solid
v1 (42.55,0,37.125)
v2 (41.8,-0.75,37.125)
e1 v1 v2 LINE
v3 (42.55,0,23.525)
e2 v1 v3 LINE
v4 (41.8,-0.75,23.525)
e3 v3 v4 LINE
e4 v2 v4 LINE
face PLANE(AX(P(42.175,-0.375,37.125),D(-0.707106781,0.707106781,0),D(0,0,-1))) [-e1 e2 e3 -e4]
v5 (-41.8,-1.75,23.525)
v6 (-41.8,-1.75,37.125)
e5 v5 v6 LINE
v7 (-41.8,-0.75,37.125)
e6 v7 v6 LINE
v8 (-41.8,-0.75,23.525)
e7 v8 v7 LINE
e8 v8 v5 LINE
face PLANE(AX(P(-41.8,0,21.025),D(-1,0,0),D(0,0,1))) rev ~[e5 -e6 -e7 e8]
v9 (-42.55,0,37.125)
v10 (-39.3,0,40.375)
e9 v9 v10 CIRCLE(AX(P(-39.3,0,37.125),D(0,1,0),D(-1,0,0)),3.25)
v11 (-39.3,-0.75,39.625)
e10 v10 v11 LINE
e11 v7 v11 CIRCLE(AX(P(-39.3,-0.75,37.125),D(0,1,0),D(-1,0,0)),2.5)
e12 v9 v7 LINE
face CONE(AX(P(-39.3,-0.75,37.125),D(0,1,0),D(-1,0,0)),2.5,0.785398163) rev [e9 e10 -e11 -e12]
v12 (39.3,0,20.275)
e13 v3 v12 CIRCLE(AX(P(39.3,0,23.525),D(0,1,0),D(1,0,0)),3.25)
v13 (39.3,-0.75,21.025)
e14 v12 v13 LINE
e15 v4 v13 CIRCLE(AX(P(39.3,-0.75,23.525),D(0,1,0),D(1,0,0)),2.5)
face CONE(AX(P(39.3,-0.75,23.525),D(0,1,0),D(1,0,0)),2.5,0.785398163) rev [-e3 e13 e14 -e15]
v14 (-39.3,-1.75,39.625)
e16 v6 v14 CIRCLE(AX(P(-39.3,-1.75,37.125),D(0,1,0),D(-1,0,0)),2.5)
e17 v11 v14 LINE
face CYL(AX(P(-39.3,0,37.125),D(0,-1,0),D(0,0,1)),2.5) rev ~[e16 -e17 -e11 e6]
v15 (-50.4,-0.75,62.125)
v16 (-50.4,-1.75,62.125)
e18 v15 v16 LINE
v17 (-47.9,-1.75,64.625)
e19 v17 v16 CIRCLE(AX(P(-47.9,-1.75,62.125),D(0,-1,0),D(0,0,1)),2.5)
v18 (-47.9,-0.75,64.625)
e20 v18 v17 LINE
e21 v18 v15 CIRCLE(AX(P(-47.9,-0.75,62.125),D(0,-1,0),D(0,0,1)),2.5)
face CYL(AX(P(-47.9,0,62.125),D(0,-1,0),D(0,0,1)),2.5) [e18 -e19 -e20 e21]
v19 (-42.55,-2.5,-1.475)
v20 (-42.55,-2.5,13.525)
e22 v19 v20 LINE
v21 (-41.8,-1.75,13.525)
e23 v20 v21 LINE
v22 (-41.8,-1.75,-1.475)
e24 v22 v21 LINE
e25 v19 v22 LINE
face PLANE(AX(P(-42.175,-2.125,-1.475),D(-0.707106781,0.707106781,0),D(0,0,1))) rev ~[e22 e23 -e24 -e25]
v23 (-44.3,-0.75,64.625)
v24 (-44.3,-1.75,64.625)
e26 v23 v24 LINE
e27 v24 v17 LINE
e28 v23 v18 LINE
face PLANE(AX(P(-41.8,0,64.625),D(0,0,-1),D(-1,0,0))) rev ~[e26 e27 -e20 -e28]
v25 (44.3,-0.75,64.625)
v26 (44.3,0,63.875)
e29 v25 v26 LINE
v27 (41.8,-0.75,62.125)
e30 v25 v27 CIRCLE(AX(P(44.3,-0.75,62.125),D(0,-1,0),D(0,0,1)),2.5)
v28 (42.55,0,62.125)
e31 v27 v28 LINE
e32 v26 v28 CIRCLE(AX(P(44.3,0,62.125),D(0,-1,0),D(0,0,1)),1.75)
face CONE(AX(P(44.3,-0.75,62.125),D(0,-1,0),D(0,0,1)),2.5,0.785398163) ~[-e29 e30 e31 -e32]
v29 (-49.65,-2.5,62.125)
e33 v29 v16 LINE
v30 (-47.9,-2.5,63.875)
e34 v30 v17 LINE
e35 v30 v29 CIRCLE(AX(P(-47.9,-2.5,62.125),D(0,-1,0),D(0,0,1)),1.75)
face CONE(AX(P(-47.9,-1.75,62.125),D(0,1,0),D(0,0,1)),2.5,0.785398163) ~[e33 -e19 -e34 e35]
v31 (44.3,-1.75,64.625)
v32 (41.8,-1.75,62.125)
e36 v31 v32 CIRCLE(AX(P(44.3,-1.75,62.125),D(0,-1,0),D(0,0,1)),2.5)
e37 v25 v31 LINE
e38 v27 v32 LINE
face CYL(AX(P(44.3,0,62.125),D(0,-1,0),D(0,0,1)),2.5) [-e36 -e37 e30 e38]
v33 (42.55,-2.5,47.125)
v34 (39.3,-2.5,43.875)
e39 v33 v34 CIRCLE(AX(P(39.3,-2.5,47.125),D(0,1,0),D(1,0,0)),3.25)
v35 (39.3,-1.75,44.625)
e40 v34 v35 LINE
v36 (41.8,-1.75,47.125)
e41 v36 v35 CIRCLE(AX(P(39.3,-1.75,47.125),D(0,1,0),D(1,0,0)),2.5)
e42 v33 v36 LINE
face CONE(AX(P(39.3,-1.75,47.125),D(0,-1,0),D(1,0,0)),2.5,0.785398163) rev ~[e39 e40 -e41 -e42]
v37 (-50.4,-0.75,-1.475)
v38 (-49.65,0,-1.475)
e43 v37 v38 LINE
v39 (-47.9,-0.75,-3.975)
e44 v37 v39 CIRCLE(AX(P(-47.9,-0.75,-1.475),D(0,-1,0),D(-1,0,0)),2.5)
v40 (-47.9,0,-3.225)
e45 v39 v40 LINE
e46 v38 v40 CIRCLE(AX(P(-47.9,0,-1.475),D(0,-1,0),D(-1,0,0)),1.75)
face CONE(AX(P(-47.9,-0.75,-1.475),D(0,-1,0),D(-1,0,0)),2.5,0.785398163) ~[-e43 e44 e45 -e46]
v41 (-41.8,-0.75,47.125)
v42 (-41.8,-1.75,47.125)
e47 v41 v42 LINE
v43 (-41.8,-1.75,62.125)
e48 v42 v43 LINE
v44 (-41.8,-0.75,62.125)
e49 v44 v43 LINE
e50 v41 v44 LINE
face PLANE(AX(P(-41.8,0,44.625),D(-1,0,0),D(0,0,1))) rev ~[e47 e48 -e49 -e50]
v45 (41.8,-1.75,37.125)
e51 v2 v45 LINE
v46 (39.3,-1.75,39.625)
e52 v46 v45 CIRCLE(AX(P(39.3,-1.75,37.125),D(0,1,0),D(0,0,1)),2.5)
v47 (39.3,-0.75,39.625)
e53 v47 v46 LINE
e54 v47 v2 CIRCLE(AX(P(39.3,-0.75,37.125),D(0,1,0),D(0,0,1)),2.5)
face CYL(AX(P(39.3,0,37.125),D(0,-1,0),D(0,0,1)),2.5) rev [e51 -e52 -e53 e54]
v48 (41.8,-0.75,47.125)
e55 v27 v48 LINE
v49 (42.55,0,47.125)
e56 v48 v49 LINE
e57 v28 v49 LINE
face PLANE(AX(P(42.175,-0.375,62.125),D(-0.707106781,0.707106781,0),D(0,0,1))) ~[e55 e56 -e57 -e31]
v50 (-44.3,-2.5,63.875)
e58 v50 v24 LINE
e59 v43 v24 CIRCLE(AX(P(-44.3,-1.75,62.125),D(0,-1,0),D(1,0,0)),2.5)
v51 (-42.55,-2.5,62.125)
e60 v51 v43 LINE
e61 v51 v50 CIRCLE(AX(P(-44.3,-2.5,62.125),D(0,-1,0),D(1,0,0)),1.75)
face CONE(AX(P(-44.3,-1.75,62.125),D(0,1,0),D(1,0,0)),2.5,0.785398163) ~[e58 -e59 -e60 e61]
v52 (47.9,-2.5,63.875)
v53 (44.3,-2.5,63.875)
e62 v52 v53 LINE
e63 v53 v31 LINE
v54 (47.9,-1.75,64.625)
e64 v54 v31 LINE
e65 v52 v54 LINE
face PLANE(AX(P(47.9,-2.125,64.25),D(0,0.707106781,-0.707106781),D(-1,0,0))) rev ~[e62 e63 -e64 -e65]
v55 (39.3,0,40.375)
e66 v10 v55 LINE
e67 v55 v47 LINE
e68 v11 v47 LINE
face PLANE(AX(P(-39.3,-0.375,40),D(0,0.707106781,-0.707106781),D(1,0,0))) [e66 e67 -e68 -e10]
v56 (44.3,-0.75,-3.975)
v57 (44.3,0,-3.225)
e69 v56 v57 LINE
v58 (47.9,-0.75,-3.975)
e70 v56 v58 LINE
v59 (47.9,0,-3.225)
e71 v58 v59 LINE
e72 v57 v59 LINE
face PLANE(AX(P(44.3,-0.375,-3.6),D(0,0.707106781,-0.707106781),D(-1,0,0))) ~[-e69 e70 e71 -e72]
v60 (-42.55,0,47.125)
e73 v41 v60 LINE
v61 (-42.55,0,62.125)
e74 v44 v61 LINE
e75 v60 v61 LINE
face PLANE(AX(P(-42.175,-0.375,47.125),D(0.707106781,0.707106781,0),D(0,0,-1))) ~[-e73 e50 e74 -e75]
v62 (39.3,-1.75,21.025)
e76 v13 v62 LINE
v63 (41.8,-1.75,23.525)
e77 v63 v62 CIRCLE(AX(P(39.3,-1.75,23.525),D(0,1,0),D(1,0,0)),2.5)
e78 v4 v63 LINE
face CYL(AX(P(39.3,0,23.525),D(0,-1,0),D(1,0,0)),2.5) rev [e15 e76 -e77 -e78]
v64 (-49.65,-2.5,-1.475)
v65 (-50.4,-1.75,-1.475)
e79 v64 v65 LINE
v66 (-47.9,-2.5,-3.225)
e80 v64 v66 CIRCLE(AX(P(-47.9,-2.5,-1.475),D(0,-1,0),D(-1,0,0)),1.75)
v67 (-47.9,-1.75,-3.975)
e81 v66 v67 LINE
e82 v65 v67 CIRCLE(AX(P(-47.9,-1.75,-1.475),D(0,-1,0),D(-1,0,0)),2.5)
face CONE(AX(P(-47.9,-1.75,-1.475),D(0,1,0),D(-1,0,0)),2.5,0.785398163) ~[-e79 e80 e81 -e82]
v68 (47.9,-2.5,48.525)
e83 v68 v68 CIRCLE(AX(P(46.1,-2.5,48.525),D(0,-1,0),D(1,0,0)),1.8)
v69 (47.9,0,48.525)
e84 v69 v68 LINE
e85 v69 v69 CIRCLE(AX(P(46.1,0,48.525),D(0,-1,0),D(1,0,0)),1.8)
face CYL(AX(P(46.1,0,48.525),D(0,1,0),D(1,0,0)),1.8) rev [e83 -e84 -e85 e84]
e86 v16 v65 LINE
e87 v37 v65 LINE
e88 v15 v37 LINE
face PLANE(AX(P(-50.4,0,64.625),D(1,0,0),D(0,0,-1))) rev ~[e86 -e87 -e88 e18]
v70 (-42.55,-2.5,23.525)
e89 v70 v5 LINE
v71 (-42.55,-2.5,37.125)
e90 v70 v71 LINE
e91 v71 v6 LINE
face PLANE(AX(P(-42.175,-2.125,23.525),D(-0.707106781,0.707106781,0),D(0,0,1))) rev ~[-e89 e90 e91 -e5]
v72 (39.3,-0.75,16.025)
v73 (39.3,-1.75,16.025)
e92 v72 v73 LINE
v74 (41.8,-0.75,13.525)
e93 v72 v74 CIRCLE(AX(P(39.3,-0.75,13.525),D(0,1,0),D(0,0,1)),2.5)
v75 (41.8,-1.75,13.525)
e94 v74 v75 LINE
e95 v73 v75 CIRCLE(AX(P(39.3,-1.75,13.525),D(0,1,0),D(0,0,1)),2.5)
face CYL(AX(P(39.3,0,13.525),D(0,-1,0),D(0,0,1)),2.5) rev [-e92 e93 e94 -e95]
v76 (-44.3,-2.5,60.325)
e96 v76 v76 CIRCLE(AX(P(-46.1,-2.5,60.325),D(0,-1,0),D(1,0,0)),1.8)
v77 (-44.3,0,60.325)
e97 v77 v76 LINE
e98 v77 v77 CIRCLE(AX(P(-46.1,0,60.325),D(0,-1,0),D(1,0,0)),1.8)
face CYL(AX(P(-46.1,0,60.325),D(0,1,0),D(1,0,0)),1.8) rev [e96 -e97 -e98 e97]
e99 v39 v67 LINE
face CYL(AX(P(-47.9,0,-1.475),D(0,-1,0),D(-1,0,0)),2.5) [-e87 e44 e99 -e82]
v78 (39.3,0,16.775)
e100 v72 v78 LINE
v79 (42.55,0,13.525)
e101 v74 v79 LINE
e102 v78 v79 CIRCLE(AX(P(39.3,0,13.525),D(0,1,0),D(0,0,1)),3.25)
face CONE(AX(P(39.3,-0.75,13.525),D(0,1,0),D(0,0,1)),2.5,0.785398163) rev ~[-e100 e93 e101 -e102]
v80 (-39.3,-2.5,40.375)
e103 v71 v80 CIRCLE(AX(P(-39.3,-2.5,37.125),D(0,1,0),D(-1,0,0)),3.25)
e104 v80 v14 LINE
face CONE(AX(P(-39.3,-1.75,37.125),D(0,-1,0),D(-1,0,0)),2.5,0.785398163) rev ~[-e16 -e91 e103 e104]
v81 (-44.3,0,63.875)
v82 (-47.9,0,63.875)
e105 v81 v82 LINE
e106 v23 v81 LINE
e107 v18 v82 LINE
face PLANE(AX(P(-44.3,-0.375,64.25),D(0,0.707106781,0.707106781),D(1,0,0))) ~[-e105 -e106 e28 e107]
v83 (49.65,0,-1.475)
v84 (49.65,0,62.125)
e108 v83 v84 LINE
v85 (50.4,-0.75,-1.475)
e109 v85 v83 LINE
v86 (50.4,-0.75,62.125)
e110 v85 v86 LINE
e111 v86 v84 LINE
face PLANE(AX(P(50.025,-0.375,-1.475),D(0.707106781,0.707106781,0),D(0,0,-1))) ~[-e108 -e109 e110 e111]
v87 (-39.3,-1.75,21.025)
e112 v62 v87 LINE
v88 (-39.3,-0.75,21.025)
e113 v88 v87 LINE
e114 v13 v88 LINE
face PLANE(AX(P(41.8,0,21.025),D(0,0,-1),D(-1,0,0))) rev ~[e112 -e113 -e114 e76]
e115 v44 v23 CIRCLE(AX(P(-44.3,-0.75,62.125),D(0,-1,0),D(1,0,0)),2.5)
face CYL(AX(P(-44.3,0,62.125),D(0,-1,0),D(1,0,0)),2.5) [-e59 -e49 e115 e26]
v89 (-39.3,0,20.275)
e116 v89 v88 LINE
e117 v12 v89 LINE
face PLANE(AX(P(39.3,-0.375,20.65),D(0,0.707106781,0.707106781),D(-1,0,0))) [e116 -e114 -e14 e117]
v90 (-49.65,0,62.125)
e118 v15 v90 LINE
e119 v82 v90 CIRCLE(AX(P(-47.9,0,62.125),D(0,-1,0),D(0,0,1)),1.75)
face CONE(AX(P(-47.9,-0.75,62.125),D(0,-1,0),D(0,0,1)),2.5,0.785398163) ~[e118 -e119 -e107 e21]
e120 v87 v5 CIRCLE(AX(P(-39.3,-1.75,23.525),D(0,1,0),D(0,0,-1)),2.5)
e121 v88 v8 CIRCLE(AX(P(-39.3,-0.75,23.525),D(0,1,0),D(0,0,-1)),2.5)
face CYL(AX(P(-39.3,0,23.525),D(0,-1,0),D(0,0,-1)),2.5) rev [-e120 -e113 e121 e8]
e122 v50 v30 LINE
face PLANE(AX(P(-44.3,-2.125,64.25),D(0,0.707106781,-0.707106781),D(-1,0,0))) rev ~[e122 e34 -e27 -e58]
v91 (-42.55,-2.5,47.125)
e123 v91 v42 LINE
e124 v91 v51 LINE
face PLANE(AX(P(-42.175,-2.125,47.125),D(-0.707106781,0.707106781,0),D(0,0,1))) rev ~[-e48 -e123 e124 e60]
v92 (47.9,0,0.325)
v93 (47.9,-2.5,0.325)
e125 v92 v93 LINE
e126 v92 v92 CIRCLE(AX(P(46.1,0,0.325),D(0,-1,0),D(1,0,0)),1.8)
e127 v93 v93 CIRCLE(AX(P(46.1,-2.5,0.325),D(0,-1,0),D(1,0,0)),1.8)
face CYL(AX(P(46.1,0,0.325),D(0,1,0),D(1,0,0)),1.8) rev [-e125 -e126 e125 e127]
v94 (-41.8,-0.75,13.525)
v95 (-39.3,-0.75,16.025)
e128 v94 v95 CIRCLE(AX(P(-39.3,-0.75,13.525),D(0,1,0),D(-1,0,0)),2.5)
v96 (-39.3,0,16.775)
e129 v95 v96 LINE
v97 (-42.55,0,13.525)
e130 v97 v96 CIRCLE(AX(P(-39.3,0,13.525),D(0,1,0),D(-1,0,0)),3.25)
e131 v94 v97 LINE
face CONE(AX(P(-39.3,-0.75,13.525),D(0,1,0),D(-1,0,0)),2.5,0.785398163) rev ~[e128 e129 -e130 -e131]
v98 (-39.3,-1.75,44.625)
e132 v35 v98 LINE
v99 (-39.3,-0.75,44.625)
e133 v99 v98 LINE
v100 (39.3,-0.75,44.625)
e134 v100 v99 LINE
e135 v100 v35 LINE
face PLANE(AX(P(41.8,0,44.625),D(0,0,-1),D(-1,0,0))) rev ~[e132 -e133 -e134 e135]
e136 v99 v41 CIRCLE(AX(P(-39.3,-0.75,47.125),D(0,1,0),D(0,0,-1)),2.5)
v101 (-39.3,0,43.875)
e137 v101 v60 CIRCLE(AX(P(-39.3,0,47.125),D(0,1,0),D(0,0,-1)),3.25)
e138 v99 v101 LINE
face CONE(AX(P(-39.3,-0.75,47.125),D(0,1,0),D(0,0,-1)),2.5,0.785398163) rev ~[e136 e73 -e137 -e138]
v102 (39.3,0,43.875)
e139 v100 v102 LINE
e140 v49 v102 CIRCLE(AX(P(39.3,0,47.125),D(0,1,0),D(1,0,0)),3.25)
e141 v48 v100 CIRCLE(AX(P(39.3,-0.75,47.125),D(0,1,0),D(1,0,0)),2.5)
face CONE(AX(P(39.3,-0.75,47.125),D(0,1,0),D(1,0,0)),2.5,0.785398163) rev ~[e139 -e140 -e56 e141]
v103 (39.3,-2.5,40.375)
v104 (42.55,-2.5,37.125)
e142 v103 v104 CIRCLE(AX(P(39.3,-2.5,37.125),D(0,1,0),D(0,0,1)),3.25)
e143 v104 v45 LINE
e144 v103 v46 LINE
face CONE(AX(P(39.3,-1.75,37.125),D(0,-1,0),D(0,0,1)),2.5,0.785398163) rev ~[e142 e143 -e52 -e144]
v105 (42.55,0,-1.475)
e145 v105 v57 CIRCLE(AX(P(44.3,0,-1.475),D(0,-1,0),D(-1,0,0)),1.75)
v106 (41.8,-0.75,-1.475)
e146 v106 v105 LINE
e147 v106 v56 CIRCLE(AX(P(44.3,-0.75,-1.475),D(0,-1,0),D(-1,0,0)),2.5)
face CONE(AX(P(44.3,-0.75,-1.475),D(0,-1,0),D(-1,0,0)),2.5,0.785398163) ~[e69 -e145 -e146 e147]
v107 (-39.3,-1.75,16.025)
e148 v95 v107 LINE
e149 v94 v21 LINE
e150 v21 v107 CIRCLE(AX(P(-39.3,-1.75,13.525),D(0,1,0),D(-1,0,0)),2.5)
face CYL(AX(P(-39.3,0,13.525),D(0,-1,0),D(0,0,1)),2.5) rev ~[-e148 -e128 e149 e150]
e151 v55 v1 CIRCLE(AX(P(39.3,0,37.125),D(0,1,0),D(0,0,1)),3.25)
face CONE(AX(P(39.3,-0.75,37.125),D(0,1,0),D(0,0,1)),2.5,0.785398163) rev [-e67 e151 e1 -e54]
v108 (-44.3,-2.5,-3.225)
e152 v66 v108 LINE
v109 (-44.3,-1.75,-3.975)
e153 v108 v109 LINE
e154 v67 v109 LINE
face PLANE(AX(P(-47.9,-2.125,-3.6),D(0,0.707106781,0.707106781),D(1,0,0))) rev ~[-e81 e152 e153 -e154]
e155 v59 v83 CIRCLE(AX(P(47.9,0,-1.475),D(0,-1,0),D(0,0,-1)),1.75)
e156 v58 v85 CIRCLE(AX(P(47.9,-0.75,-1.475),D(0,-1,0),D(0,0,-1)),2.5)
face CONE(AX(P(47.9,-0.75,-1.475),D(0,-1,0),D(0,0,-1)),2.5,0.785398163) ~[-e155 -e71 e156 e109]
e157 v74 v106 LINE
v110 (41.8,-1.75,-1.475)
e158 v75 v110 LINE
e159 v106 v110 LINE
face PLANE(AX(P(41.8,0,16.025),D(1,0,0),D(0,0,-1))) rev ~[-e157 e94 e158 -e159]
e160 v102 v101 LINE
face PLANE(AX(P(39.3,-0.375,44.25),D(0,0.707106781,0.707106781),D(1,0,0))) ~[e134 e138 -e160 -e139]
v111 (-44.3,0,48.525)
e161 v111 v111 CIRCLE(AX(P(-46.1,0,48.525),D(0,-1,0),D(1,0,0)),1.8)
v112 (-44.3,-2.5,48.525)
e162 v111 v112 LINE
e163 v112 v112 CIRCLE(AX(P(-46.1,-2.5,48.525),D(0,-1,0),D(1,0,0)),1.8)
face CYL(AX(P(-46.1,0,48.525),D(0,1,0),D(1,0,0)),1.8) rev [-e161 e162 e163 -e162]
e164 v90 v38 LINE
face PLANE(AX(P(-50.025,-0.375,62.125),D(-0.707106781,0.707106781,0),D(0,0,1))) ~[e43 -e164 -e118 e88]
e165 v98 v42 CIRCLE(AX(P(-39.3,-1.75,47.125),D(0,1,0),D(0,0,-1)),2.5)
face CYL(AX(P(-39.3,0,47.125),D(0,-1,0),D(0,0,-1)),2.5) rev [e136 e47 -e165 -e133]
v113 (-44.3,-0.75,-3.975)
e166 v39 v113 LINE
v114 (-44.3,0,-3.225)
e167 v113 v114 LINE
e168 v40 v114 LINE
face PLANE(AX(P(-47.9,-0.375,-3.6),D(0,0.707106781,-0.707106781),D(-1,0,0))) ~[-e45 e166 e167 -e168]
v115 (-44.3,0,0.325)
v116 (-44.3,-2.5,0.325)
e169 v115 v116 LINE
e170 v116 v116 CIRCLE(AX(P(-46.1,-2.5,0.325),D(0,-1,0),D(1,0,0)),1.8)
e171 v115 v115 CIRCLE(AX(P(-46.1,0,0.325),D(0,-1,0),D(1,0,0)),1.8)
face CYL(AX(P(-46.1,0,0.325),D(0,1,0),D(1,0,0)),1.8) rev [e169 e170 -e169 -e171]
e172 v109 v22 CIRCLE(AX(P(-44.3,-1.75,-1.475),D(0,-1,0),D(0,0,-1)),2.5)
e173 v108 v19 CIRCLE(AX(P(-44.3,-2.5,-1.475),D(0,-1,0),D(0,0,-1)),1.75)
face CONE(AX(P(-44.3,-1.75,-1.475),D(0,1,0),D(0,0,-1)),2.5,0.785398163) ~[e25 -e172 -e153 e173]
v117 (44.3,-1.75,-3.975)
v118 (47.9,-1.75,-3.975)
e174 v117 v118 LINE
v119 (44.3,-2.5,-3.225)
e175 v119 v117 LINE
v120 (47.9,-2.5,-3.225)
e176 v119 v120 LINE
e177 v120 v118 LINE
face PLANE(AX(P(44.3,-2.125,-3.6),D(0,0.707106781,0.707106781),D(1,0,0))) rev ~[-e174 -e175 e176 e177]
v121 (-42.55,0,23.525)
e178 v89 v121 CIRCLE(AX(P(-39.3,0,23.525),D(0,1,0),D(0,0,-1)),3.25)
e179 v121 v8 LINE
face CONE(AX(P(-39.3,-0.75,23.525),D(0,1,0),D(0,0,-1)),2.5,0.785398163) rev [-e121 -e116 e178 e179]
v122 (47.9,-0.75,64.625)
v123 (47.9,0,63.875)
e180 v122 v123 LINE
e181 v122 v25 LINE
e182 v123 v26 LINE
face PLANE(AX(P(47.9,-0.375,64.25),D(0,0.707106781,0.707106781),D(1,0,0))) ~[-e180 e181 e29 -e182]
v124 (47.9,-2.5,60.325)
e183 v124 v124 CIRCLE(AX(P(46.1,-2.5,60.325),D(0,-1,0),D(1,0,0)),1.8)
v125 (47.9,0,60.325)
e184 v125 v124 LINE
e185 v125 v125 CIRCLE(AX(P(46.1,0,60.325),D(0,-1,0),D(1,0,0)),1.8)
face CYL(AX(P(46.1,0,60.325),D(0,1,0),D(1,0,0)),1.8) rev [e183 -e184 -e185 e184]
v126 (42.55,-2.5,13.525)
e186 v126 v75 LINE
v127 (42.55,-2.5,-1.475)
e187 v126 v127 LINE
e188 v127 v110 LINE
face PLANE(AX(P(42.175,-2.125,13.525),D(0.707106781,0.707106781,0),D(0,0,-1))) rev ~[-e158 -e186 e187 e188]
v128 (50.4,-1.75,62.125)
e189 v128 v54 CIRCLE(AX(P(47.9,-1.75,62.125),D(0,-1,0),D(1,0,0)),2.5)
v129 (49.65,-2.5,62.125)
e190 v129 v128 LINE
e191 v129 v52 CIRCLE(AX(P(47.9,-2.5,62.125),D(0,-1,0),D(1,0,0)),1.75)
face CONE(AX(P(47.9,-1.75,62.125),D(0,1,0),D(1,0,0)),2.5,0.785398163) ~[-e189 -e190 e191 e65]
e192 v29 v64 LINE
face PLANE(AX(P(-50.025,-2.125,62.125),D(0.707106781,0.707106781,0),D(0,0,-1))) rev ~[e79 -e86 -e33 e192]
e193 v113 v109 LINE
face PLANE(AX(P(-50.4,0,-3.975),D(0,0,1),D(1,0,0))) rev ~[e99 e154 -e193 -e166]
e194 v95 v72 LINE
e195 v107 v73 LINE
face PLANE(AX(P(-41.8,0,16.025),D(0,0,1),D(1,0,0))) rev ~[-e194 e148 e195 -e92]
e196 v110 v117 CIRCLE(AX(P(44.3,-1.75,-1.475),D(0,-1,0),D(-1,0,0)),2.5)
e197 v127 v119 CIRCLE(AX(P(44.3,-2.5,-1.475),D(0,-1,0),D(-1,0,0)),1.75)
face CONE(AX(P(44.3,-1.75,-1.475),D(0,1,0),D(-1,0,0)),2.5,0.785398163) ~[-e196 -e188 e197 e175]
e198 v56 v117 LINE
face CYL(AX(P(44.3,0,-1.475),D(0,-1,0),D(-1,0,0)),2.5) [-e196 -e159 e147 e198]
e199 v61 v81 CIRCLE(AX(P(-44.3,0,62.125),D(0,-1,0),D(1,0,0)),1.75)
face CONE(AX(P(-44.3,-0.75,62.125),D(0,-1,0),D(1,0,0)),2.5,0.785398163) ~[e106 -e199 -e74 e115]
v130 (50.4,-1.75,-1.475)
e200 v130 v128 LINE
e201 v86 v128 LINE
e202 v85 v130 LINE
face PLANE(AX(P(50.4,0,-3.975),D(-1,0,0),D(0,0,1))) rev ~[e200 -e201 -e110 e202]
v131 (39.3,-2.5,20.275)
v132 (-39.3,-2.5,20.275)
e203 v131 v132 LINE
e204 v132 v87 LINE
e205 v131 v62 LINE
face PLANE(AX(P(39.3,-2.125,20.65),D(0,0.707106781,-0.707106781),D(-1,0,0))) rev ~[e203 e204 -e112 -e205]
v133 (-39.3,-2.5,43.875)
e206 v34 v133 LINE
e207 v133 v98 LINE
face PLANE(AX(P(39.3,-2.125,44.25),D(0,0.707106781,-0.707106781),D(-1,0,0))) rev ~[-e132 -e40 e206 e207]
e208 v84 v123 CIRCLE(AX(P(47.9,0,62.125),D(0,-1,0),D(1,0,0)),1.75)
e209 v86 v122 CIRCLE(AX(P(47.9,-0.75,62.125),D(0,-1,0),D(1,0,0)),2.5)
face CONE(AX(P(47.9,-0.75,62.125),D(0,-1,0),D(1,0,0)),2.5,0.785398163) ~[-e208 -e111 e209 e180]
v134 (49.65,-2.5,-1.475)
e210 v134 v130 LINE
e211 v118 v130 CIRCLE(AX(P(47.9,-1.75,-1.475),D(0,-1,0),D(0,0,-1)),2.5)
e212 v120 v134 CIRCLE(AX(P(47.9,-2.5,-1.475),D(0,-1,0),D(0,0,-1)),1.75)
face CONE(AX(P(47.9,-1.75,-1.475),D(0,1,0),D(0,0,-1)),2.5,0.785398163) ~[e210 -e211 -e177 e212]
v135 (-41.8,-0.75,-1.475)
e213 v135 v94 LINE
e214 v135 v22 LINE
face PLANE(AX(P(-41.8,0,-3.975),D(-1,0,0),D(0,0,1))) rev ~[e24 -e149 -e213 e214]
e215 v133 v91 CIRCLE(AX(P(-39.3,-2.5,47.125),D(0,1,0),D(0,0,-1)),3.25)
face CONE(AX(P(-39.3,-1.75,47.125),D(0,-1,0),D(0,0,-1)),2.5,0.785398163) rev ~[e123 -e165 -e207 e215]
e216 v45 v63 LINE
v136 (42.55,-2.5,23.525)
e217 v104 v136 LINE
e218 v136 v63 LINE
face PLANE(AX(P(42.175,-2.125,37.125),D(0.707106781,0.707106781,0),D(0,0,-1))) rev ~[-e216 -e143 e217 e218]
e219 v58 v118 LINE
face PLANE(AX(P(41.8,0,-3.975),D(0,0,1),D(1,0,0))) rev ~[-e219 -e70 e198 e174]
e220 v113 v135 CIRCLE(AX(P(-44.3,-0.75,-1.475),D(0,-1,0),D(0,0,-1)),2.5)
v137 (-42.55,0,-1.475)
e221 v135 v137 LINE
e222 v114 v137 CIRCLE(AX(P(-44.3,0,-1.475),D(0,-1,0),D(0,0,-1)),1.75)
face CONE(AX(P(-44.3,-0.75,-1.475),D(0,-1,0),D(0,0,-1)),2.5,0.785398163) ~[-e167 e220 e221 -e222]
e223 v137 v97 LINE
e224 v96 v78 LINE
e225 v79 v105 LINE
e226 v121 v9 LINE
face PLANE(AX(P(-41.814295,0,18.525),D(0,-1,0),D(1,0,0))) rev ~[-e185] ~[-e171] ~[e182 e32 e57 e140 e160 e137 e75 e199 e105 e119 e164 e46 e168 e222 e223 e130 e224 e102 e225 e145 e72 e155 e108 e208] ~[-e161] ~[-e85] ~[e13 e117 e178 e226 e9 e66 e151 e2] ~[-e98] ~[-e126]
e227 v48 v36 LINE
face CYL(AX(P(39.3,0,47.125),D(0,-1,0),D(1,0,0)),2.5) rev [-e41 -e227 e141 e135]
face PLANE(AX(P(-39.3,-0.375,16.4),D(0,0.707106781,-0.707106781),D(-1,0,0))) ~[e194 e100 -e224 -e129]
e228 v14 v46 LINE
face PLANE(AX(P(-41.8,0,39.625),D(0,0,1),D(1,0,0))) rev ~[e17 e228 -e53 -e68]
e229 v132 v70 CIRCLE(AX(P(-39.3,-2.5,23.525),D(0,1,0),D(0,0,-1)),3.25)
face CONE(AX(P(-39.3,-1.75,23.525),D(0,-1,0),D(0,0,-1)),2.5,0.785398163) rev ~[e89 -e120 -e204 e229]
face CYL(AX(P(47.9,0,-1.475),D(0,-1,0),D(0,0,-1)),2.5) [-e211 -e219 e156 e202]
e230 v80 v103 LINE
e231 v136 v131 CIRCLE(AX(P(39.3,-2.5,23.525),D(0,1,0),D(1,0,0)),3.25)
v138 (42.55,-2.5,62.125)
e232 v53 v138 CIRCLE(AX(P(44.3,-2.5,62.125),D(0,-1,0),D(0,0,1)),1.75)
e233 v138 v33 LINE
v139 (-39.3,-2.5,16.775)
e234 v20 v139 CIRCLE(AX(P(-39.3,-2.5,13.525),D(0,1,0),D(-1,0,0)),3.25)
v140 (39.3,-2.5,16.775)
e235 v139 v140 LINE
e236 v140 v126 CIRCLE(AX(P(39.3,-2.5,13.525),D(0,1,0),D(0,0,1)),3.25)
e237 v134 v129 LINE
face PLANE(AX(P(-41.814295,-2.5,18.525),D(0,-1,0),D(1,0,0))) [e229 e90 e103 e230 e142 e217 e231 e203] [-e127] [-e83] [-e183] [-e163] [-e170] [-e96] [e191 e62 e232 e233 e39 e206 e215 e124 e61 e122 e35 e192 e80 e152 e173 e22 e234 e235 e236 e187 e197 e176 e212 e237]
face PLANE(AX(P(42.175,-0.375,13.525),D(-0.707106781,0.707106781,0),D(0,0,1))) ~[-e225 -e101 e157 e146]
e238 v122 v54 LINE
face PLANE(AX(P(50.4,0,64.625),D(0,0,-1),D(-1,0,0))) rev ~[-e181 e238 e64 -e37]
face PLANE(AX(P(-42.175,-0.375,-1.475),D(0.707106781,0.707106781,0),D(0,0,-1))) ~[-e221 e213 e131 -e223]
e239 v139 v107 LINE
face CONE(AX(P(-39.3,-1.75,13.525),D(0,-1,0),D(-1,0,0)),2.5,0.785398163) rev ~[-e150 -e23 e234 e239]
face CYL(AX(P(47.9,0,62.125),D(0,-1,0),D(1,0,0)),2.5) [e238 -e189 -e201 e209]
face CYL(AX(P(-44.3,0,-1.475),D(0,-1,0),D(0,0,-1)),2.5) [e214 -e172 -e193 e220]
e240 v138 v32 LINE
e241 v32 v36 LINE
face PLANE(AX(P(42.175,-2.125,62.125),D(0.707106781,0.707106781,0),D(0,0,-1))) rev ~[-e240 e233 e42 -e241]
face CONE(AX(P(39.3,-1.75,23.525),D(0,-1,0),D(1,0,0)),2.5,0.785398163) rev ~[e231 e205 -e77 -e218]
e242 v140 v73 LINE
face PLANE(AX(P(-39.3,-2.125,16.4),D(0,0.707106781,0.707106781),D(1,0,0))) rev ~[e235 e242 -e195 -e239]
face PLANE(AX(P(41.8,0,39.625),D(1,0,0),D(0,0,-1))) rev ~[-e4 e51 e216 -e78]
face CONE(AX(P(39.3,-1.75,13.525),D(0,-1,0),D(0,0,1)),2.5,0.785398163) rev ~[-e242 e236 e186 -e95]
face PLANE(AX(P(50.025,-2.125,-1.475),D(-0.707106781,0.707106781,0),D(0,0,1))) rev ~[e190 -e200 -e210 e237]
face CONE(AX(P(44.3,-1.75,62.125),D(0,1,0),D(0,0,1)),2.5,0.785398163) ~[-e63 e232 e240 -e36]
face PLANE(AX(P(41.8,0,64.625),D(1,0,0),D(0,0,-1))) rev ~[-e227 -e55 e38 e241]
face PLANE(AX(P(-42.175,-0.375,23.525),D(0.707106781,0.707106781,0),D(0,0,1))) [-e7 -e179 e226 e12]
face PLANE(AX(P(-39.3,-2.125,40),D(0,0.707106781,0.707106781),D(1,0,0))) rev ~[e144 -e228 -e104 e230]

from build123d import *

# Parameters (mm, degrees)
F0_W     = 0.0285906434
F0_H     = 5
F0_W_2   = 41.8
F0_R     = 1.8
F1_DEPTH = 2.5
F2_R     = 2.5
F3_SIZE  = 0.75


# Not quite as in the source:
# - a feature names something its author has since deleted; it is built from what else it names


with BuildPart() as f1:
    # F0 (on Front) → F1 (new body)
    with BuildSketch(Plane.XZ):
        with Locations((-41.8142953217, 18.525)):
            Rectangle(F0_W, F0_H)
        with Locations((41.8142953217, 18.525)):
            Rectangle(F0_W, F0_H)
        with Locations((-20.9, 18.525)):
            Rectangle(F0_W_2, F0_H)
        with Locations((20.9, 18.525)):
            Rectangle(F0_W_2, F0_H)
        with Locations((20.9, 42.125)):
            Rectangle(F0_W_2, F0_H)
        Polygon((41.8, 64.625), (41.8, 44.625), (41.8, 39.625), (41.8, 21.025), (41.8285906434, 21.025), (41.8285906434, 16.025), (41.8, 16.025), (41.8, -3.975), (50.4, -3.975), (50.4, 64.625), align=None)
        with Locations((46.1, 0.325)):
            Circle(F0_R, mode=Mode.SUBTRACT)
        with Locations((46.1, 48.525)):
            Circle(F0_R, mode=Mode.SUBTRACT)
        with Locations((46.1, 60.325)):
            Circle(F0_R, mode=Mode.SUBTRACT)
        with Locations((-20.9, 42.125)):
            Rectangle(F0_W_2, F0_H)
        Polygon((-41.8, 64.625), (-50.4, 64.625), (-50.4, -3.975), (-41.8, -3.975), (-41.8, 16.025), (-41.8285906434, 16.025), (-41.8285906434, 21.025), (-41.8, 21.025), (-41.8, 39.625), (-41.8, 44.625), align=None)
        with Locations((-46.1, 0.325)):
            Circle(F0_R, mode=Mode.SUBTRACT)
        with Locations((-46.1, 48.525)):
            Circle(F0_R, mode=Mode.SUBTRACT)
        with Locations((-46.1, 60.325)):
            Circle(F0_R, mode=Mode.SUBTRACT)
    extrude(amount=F1_DEPTH)

    # F2
    f2_edges = [f1.edges().sort_by_distance(p)[0] for p in [
        (-41.8, -1.25, 44.625),
        (41.8, -1.25, 44.625),
        (-41.8, -1.25, 39.625),
        (41.8, -1.25, 39.625),
        (-41.8, -1.25, 21.025),
        (41.8, -1.25, 21.025),
        (-41.8, -1.25, 16.025),
        (41.8, -1.25, 16.025),
        (41.8, -1.25, -3.975),
        (50.4, -1.25, -3.975),
        (-50.4, -1.25, -3.975),
        (-41.8, -1.25, -3.975),
        (50.4, -1.25, 64.625),
        (41.8, -1.25, 64.625),
        (-50.4, -1.25, 64.625),
        (-41.8, -1.25, 64.625),
    ]]
    fillet(f2_edges, radius=F2_R)

    # F3
    f3_edges = [f1.edges().sort_by_distance(p)[0] for p in [
        (0, 0, 16.025),
        (0, 0, 39.625),
        (-46.1, -2.5, 64.625),
        (0, -2.5, 39.625),
    ]]
    chamfer(f3_edges, length=F3_SIZE)


solid = f1.part
